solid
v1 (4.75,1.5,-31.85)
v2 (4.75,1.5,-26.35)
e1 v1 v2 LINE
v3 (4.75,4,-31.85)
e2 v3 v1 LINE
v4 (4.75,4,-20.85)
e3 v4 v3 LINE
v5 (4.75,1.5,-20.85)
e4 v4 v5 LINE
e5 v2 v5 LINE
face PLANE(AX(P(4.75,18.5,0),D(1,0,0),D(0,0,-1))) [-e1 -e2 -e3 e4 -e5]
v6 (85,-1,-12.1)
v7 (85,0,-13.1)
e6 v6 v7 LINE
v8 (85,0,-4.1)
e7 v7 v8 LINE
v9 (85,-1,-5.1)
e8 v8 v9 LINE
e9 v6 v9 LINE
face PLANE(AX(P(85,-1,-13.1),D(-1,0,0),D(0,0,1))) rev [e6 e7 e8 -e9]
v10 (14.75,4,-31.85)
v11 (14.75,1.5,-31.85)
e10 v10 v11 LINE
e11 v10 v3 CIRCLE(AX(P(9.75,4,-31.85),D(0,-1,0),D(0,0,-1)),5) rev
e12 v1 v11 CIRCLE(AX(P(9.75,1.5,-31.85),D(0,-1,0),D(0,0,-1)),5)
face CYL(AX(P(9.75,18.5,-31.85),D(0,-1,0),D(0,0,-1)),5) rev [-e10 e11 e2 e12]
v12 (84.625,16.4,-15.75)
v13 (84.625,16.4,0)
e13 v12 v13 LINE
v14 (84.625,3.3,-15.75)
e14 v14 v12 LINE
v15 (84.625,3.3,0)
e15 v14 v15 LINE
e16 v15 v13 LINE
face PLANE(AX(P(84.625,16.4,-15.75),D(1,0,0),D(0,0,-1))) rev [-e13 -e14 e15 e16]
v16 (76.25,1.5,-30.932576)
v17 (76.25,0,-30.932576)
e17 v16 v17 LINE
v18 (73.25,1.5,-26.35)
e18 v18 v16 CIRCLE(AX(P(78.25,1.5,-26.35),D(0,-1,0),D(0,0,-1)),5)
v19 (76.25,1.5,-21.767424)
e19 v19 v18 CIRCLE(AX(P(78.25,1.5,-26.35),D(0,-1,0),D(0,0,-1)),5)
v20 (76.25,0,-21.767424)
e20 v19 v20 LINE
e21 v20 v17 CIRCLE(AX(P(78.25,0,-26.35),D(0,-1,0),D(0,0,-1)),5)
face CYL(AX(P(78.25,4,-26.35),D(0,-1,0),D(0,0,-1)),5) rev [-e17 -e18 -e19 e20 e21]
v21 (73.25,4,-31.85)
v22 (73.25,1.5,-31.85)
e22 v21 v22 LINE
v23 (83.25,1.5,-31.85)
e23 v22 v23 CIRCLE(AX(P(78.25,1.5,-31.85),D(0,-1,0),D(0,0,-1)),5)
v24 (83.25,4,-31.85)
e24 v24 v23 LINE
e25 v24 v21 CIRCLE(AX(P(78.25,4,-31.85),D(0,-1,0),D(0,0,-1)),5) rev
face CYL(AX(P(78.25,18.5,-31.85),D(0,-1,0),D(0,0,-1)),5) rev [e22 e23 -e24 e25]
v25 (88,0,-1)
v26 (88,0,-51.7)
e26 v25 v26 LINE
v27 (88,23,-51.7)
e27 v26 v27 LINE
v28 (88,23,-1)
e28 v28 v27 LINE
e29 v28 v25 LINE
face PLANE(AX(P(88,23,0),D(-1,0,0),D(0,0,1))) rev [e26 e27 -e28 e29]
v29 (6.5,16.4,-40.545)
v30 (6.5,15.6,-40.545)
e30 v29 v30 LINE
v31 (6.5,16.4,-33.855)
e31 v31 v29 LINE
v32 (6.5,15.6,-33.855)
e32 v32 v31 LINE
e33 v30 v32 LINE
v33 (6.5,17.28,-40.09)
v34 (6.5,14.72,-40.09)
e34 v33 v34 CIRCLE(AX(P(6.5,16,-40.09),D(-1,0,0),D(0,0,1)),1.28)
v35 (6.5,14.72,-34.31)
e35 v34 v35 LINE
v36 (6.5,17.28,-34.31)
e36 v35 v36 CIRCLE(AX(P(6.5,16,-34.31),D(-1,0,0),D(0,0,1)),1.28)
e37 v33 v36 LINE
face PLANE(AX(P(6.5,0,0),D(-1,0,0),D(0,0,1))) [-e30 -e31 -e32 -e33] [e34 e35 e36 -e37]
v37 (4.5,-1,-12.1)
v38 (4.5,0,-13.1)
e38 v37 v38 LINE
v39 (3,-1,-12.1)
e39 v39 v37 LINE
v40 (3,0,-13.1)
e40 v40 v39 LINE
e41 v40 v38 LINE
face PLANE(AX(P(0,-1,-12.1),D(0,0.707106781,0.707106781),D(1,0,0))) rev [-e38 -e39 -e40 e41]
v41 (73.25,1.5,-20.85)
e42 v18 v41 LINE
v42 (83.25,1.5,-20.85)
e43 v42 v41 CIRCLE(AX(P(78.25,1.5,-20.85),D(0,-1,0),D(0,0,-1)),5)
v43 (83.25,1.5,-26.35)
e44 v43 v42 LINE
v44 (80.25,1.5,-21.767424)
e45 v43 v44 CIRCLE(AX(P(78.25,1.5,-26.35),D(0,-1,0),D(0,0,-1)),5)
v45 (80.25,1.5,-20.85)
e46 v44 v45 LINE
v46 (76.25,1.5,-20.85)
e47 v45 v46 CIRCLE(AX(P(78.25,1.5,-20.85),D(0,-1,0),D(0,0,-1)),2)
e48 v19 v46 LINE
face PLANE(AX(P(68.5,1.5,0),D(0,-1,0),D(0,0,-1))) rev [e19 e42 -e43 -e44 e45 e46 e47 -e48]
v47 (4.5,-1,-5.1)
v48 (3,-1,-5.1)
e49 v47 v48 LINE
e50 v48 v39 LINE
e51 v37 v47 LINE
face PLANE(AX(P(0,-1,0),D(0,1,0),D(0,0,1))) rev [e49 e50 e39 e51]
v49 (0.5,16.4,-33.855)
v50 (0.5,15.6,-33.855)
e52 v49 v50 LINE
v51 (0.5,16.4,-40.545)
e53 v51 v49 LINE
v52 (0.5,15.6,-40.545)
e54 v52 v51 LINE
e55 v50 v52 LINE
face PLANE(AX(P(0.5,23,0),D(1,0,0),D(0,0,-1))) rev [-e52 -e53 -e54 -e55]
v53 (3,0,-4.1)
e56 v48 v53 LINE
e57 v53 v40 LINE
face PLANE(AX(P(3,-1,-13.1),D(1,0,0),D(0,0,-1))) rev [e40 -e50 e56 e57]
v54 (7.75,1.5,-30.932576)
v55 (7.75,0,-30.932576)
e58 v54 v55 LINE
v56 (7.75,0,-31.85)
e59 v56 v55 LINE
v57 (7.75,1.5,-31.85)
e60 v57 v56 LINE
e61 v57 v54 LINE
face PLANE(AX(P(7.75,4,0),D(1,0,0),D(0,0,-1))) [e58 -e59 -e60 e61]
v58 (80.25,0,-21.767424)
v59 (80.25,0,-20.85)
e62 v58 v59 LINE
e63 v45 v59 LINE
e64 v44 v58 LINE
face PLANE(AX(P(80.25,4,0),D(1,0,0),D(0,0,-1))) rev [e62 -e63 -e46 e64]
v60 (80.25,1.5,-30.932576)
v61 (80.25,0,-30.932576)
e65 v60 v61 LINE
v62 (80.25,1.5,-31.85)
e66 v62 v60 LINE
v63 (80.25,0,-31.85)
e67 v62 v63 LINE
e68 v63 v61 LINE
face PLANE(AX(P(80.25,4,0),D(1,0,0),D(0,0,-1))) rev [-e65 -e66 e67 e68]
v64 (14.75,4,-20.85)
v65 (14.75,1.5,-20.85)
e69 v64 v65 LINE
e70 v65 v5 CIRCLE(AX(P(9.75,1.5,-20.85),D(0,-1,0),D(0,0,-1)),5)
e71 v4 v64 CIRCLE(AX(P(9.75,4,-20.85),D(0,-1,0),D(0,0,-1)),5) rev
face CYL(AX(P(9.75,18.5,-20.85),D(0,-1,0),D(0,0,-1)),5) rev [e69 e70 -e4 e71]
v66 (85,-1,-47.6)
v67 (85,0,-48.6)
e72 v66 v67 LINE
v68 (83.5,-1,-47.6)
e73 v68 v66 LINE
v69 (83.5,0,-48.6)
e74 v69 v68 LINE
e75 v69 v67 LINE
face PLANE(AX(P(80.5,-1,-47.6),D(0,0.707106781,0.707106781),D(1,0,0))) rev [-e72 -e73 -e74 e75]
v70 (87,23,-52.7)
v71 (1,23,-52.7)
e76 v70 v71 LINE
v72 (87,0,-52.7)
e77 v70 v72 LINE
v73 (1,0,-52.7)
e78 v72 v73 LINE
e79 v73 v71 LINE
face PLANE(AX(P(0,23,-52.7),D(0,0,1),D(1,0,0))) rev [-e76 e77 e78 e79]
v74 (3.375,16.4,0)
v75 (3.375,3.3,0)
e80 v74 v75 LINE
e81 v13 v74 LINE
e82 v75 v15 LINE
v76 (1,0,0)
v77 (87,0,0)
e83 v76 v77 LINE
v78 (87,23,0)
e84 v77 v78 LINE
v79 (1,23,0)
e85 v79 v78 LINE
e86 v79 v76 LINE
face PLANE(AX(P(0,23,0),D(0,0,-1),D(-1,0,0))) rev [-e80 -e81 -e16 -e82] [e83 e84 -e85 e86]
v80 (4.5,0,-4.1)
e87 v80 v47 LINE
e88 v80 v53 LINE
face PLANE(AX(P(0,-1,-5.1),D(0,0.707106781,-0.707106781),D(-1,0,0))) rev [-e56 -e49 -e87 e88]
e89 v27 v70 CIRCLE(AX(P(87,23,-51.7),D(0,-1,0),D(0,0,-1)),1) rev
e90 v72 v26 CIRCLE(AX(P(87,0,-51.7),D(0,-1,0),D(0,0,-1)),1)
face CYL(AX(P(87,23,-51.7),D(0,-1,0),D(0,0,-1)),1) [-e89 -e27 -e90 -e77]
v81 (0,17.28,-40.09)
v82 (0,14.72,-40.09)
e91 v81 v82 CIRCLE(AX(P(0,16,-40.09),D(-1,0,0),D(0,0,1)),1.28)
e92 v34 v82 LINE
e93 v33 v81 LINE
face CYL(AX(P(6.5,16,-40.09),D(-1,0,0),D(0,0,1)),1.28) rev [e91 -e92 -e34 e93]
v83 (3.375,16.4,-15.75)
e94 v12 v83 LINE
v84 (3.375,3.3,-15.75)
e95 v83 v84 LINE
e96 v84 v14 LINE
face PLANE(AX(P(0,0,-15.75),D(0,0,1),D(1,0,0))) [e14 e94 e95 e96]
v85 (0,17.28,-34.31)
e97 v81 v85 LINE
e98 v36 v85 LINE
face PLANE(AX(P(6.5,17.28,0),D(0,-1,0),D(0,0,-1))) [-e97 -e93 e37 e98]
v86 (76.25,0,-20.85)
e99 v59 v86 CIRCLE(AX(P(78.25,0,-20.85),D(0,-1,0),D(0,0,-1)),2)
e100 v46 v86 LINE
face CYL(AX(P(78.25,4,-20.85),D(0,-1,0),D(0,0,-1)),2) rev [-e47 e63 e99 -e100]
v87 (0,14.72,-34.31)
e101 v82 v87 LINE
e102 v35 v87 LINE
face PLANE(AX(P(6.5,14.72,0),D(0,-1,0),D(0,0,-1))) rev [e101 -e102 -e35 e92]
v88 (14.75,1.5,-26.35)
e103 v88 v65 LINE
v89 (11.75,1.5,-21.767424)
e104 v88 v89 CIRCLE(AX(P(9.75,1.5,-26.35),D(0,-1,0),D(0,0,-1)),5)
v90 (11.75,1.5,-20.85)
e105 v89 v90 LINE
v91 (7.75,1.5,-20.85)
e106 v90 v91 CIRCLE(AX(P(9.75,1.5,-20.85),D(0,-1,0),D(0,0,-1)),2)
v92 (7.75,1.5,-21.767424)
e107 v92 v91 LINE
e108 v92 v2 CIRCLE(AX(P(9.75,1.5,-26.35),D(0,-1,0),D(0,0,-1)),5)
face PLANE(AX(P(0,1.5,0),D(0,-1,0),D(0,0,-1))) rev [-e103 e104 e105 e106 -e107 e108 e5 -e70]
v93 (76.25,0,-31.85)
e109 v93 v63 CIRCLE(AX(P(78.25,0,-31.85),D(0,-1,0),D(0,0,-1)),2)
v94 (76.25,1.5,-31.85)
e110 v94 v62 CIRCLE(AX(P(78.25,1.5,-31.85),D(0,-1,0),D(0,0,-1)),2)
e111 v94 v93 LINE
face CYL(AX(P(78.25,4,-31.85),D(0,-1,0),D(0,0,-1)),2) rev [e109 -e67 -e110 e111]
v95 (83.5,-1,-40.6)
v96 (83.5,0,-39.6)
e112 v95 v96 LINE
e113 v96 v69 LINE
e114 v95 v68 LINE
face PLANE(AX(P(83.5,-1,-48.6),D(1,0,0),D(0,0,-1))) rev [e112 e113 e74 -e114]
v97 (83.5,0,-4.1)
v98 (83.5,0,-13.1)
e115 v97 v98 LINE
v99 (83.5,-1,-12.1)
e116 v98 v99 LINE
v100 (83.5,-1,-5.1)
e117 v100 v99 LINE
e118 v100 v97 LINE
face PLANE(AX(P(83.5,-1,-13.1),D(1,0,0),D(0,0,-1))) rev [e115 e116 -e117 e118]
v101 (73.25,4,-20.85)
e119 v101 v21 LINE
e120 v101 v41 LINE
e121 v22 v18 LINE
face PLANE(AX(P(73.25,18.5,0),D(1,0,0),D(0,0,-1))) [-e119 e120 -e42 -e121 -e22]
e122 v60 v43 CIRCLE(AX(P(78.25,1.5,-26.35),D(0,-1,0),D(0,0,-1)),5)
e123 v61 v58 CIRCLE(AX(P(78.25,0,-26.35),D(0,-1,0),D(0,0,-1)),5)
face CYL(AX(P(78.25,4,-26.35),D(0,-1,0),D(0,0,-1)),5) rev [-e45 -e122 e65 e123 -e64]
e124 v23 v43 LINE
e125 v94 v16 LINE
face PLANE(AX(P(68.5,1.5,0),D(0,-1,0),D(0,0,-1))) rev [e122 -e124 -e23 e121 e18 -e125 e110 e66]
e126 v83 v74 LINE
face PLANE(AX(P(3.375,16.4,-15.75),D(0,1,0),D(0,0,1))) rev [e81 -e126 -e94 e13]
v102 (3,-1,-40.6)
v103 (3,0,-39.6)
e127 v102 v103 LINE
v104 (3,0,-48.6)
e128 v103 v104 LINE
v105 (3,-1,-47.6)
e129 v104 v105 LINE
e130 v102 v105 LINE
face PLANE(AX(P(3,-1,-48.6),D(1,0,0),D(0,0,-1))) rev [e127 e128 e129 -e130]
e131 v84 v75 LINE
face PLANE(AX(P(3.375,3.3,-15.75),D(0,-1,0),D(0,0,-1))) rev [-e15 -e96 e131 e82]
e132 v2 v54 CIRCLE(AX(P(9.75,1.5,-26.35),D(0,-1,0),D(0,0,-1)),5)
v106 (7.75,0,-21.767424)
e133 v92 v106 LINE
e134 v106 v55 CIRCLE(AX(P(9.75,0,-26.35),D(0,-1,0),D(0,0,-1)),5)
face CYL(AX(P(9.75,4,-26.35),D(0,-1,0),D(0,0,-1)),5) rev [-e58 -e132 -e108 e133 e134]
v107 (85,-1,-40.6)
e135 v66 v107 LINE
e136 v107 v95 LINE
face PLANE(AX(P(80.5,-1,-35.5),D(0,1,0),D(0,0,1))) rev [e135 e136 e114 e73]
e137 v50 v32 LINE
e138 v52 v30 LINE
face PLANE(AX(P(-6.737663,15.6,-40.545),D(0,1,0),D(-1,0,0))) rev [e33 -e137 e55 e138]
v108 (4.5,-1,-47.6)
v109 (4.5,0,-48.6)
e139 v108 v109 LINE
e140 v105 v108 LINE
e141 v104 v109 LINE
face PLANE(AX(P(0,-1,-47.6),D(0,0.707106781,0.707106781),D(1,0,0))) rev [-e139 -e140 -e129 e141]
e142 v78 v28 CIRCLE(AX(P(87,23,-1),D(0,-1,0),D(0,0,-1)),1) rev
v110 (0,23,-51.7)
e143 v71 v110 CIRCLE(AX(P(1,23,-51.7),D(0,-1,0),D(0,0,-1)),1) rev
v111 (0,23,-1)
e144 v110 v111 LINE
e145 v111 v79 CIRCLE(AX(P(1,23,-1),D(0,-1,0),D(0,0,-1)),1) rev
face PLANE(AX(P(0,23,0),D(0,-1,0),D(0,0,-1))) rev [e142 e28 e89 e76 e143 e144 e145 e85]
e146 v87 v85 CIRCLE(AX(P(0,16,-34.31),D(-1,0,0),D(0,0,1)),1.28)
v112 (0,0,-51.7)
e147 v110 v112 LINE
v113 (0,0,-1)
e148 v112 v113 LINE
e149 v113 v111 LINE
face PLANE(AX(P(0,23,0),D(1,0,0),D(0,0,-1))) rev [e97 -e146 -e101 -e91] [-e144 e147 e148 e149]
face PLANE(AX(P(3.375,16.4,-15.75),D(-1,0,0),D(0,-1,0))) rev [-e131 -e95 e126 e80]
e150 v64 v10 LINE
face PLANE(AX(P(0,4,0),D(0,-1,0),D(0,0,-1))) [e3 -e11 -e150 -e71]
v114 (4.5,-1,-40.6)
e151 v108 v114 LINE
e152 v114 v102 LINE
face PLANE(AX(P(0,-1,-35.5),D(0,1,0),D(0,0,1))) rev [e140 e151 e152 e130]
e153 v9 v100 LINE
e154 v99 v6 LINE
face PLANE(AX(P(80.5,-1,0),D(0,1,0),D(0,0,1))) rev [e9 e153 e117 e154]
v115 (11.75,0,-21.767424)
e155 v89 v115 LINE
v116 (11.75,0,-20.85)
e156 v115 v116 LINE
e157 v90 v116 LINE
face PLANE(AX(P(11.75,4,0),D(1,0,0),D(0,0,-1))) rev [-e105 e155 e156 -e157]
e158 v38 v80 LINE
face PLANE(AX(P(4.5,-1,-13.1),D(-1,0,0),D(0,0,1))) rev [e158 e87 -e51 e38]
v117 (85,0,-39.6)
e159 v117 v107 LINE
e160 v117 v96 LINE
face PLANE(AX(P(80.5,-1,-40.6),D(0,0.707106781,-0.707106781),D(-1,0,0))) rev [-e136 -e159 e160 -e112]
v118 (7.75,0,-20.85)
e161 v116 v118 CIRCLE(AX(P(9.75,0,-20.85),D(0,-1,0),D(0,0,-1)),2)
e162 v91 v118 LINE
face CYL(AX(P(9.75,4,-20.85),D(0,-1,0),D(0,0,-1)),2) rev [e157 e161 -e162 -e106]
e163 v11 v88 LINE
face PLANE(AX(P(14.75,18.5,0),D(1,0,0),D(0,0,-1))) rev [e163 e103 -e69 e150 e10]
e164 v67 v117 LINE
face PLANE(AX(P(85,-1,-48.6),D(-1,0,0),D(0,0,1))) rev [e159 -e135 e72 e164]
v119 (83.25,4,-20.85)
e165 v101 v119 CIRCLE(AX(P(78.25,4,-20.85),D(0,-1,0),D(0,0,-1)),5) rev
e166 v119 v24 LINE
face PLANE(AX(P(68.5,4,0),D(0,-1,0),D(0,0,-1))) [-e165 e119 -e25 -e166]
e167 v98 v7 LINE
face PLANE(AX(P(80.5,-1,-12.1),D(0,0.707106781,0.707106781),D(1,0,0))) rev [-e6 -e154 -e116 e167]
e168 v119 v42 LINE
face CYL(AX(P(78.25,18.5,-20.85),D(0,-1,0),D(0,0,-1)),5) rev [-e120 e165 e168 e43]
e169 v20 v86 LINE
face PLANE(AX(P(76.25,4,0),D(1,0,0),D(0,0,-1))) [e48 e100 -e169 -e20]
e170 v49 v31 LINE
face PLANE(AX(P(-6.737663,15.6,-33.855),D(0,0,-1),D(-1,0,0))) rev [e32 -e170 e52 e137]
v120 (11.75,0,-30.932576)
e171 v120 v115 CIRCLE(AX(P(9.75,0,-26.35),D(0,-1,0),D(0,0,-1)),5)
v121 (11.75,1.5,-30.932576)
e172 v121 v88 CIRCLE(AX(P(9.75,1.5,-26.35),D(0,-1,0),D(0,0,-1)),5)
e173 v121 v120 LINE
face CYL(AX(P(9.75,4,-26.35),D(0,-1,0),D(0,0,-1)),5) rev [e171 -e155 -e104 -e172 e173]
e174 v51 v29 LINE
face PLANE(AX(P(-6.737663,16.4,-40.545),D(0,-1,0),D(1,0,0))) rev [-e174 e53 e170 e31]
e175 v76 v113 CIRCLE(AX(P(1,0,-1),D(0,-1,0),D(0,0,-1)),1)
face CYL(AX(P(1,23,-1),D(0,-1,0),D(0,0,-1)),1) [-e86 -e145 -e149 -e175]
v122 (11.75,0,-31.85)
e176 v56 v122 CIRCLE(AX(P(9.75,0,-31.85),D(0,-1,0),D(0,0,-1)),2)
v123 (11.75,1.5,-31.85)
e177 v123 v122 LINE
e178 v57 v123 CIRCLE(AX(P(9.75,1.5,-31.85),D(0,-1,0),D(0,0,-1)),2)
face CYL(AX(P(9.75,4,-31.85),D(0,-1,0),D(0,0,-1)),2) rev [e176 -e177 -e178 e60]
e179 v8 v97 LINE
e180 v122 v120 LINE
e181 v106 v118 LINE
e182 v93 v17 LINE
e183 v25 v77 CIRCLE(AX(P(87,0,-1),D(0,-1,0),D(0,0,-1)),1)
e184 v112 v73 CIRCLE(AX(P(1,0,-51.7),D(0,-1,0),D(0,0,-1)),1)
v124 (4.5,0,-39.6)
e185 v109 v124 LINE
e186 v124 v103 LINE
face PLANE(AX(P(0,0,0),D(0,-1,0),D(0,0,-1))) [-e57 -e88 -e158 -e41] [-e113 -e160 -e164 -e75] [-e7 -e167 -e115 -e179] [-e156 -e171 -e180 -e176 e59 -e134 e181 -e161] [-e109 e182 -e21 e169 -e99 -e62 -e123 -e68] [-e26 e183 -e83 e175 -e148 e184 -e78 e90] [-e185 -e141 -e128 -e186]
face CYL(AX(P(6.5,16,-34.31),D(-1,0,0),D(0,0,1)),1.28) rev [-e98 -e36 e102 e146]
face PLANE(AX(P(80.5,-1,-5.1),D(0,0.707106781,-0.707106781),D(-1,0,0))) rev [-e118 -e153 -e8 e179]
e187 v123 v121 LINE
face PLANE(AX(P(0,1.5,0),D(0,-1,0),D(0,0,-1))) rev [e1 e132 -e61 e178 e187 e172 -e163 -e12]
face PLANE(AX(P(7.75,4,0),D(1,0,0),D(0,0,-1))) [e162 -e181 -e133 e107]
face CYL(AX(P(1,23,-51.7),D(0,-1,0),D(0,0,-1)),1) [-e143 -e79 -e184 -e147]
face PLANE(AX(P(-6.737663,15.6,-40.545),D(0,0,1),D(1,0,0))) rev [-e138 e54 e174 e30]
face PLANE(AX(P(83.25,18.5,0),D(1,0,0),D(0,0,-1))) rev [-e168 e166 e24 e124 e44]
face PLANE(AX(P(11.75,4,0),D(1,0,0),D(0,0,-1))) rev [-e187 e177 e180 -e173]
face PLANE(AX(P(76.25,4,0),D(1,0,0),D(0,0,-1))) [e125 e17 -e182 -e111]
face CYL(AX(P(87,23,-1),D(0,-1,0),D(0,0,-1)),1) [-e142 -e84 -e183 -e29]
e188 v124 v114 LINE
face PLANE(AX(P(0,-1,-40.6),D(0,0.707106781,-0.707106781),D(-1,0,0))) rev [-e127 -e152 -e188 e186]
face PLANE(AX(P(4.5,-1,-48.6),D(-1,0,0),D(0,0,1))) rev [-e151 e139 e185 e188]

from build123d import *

# Parameters (mm, degrees)
SKETCH1_W                        = 88
SKETCH1_H                        = 52.7
BOSS_EXTRUDE1_DEPTH              = 23
SKETCH2_W                        = 81.25
SKETCH2_H                        = 13.1
CUT_EXTRUDE1_DEPTH               = 15.75
CUT_EXTRUDE2_DEPTH               = 6.5
SKETCH4_W                        = 6.69
SKETCH4_H                        = 0.8
BOSS_EXTRUDE2_DEPTH              = 6
FILLET1_R                        = 1
SKETCH6_W                        = 1.5
SKETCH6_H                        = 9
BOSS_EXTRUDE3_DEPTH              = 1
CHAMFER1_SIZE                    = 1
CHAMFER1_OF_SKETCH_PATTERN1_SIZE = 1
CUT_EXTRUDE3_DEPTH               = 4
CUT_EXTRUDE4_START               = -1.5
CUT_EXTRUDE4_DEPTH               = 2.5


with BuildPart() as part:
    # Sketch1 → Boss-Extrude1 (new body)
    with BuildSketch(Plane(origin=(0, 0, 0), x_dir=(1, 0, 0), z_dir=(0, 1, 0))):
        with Locations((44, 26.35)):
            Rectangle(SKETCH1_W, SKETCH1_H)
    extrude(amount=BOSS_EXTRUDE1_DEPTH)

    # Sketch2 → Cut-Extrude1 (cut)
    with BuildSketch(Plane.XY):
        with Locations((44, 9.85)):
            Rectangle(SKETCH2_W, SKETCH2_H)
    extrude(amount=-CUT_EXTRUDE1_DEPTH, mode=Mode.SUBTRACT)

    # Sketch3 → Cut-Extrude2 (cut)
    with BuildSketch(Plane.ZY):
        with BuildLine():
            ThreePointArc((-40.09, 17.28), (-41.37, 16), (-40.09, 14.72))
            Line((-40.09, 14.72), (-40.09, 17.28))
        make_face()
        with BuildLine():
            Line((-40.09, 17.28), (-40.09, 14.72))
            ThreePointArc((-40.09, 14.72), (-39.18490332, 15.09490332), (-38.81, 16))
            ThreePointArc((-38.81, 16), (-39.18490332, 16.90509668), (-40.09, 17.28))
        make_face()
        with BuildLine():
            ThreePointArc((-38.81, 16), (-39.18490332, 15.09490332), (-40.09, 14.72))
            Line((-40.09, 14.72), (-34.31, 14.72))
            ThreePointArc((-34.31, 14.72), (-35.59, 16), (-34.31, 17.28))
            Line((-34.31, 17.28), (-40.09, 17.28))
            ThreePointArc((-40.09, 17.28), (-39.18490332, 16.90509668), (-38.81, 16))
        make_face()
        with BuildLine():
            ThreePointArc((-34.31, 17.28), (-35.59, 16), (-34.31, 14.72))
            Line((-34.31, 14.72), (-34.31, 17.28))
        make_face()
        with BuildLine():
            Line((-34.31, 17.28), (-34.31, 14.72))
            ThreePointArc((-34.31, 14.72), (-33.40490332, 15.09490332), (-33.03, 16))
            ThreePointArc((-33.03, 16), (-33.40490332, 16.90509668), (-34.31, 17.28))
        make_face()
    extrude(amount=-CUT_EXTRUDE2_DEPTH, mode=Mode.SUBTRACT)

    # Sketch4 → Boss-Extrude2 (add)
    with BuildSketch(Plane.ZY.offset(-6.5)):
        with Locations((-37.2, 16)):
            Rectangle(SKETCH4_W, SKETCH4_H)
    extrude(amount=BOSS_EXTRUDE2_DEPTH)

    # Fillet1
    fillet1_edges = [part.edges().sort_by_distance(p)[0] for p in [
        (0, 11.5, -52.7),
        (88, 11.5, -52.7),
        (88, 11.5, 0),
        (0, 11.5, 0),
    ]]
    fillet(fillet1_edges, radius=FILLET1_R)

    # Sketch6 → Boss-Extrude3 (add)
    with BuildSketch(Plane.XZ):
        with Locations((3.75, -8.6)):
            Rectangle(SKETCH6_W, SKETCH6_H)
    boss_extrude3 = extrude(amount=BOSS_EXTRUDE3_DEPTH)

    # Chamfer1
    chamfer1_edges = [part.edges().sort_by_distance(p)[0] for p in [
        (3.75, -1, -4.1),
        (3.75, -1, -13.1),
    ]]
    chamfer(chamfer1_edges, length=CHAMFER1_SIZE - 0.0001)  # a hair under: the kernel refuses the full size

    # Sketch-Pattern1: Boss-Extrude3 at 3 more places
    with Locations((0, 0, -35.5), (80.5, 0, -35.5), (80.5, 0, 0)):
        add(boss_extrude3)

    # Chamfer1 of Sketch-Pattern1
    chamfer1_of_sketch_pattern1_edges = [part.edges().sort_by_distance(p)[0] for p in [
        (3.75, -1, -39.6),
        (3.75, -1, -48.6),
        (84.25, -1, -39.6),
        (84.25, -1, -48.6),
        (84.25, -1, -4.1),
        (84.25, -1, -13.1),
    ]]
    chamfer(chamfer1_of_sketch_pattern1_edges, length=CHAMFER1_OF_SKETCH_PATTERN1_SIZE - 0.0001)  # a hair under: the kernel refuses the full size

    # Sketch9 → Cut-Extrude3 (cut)
    with BuildSketch(Plane.XZ):
        with BuildLine():
            Line((11.75, -21.767424305), (11.75, -30.932575695))
            ThreePointArc((11.75, -30.932575695), (13.933300133, -29.088612788), (14.75, -26.35))
            ThreePointArc((14.75, -26.35), (13.933300133, -23.611387212), (11.75, -21.767424305))
        make_face()
        with BuildLine():
            Line((7.75, -21.767424305), (7.75, -30.932575695))
            ThreePointArc((7.75, -30.932575695), (9.75, -31.35), (11.75, -30.932575695))
            Line((11.75, -30.932575695), (11.75, -21.767424305))
            ThreePointArc((11.75, -21.767424305), (9.75, -21.35), (7.75, -21.767424305))
        make_face()
        with BuildLine():
            ThreePointArc((4.75, -26.35), (5.566699867, -29.088612788), (7.75, -30.932575695))
            Line((7.75, -30.932575695), (7.75, -21.767424305))
            ThreePointArc((7.75, -21.767424305), (5.566699867, -23.611387212), (4.75, -26.35))
        make_face()
        with BuildLine():
            Line((7.75, -20.85), (7.75, -21.767424305))
            ThreePointArc((7.75, -21.767424305), (9.75, -21.35), (11.75, -21.767424305))
            Line((11.75, -21.767424305), (11.75, -20.85))
            ThreePointArc((11.75, -20.85), (9.75, -18.85), (7.75, -20.85))
        make_face()
        with BuildLine():
            Line((7.75, -30.932575695), (7.75, -31.85))
            ThreePointArc((7.75, -31.85), (9.75, -33.85), (11.75, -31.85))
            Line((11.75, -31.85), (11.75, -30.932575695))
            ThreePointArc((11.75, -30.932575695), (9.75, -31.35), (7.75, -30.932575695))
        make_face()
    cut_extrude3 = extrude(amount=-CUT_EXTRUDE3_DEPTH, mode=Mode.SUBTRACT)

    # Sketch9<3> → Cut-Extrude4 (cut)
    with BuildSketch(Plane.XZ.offset(CUT_EXTRUDE4_START)):
        with BuildLine():
            ThreePointArc((11.75, -31.85), (9.75, -33.85), (7.75, -31.85))
            Line((7.75, -31.85), (7.75, -30.932575695))
            ThreePointArc((7.75, -30.932575695), (5.566699867, -29.088612788), (4.75, -26.35))
            Line((4.75, -26.35), (4.75, -31.85))
            ThreePointArc((4.75, -31.85), (9.75, -36.85), (14.75, -31.85))
            Line((14.75, -31.85), (14.75, -26.35))
            ThreePointArc((14.75, -26.35), (13.933300133, -29.088612788), (11.75, -30.932575695))
            Line((11.75, -30.932575695), (11.75, -31.85))
        make_face()
        with BuildLine():
            ThreePointArc((4.75, -26.35), (5.566699867, -23.611387212), (7.75, -21.767424305))
            Line((7.75, -21.767424305), (7.75, -20.85))
            ThreePointArc((7.75, -20.85), (9.75, -18.85), (11.75, -20.85))
            Line((11.75, -20.85), (11.75, -21.767424305))
            ThreePointArc((11.75, -21.767424305), (13.933300133, -23.611387212), (14.75, -26.35))
            Line((14.75, -26.35), (14.75, -20.85))
            ThreePointArc((14.75, -20.85), (9.75, -15.85), (4.75, -20.85))
            Line((4.75, -20.85), (4.75, -26.35))
        make_face()
    cut_extrude4 = extrude(amount=-CUT_EXTRUDE4_DEPTH, mode=Mode.SUBTRACT)

    # Sketch-Pattern2: Cut-Extrude3, Cut-Extrude4 at 1 more place
    with Locations((68.5, 0, 0)):
        add(cut_extrude3, mode=Mode.SUBTRACT)
        add(cut_extrude4, mode=Mode.SUBTRACT)


solid = part.part
